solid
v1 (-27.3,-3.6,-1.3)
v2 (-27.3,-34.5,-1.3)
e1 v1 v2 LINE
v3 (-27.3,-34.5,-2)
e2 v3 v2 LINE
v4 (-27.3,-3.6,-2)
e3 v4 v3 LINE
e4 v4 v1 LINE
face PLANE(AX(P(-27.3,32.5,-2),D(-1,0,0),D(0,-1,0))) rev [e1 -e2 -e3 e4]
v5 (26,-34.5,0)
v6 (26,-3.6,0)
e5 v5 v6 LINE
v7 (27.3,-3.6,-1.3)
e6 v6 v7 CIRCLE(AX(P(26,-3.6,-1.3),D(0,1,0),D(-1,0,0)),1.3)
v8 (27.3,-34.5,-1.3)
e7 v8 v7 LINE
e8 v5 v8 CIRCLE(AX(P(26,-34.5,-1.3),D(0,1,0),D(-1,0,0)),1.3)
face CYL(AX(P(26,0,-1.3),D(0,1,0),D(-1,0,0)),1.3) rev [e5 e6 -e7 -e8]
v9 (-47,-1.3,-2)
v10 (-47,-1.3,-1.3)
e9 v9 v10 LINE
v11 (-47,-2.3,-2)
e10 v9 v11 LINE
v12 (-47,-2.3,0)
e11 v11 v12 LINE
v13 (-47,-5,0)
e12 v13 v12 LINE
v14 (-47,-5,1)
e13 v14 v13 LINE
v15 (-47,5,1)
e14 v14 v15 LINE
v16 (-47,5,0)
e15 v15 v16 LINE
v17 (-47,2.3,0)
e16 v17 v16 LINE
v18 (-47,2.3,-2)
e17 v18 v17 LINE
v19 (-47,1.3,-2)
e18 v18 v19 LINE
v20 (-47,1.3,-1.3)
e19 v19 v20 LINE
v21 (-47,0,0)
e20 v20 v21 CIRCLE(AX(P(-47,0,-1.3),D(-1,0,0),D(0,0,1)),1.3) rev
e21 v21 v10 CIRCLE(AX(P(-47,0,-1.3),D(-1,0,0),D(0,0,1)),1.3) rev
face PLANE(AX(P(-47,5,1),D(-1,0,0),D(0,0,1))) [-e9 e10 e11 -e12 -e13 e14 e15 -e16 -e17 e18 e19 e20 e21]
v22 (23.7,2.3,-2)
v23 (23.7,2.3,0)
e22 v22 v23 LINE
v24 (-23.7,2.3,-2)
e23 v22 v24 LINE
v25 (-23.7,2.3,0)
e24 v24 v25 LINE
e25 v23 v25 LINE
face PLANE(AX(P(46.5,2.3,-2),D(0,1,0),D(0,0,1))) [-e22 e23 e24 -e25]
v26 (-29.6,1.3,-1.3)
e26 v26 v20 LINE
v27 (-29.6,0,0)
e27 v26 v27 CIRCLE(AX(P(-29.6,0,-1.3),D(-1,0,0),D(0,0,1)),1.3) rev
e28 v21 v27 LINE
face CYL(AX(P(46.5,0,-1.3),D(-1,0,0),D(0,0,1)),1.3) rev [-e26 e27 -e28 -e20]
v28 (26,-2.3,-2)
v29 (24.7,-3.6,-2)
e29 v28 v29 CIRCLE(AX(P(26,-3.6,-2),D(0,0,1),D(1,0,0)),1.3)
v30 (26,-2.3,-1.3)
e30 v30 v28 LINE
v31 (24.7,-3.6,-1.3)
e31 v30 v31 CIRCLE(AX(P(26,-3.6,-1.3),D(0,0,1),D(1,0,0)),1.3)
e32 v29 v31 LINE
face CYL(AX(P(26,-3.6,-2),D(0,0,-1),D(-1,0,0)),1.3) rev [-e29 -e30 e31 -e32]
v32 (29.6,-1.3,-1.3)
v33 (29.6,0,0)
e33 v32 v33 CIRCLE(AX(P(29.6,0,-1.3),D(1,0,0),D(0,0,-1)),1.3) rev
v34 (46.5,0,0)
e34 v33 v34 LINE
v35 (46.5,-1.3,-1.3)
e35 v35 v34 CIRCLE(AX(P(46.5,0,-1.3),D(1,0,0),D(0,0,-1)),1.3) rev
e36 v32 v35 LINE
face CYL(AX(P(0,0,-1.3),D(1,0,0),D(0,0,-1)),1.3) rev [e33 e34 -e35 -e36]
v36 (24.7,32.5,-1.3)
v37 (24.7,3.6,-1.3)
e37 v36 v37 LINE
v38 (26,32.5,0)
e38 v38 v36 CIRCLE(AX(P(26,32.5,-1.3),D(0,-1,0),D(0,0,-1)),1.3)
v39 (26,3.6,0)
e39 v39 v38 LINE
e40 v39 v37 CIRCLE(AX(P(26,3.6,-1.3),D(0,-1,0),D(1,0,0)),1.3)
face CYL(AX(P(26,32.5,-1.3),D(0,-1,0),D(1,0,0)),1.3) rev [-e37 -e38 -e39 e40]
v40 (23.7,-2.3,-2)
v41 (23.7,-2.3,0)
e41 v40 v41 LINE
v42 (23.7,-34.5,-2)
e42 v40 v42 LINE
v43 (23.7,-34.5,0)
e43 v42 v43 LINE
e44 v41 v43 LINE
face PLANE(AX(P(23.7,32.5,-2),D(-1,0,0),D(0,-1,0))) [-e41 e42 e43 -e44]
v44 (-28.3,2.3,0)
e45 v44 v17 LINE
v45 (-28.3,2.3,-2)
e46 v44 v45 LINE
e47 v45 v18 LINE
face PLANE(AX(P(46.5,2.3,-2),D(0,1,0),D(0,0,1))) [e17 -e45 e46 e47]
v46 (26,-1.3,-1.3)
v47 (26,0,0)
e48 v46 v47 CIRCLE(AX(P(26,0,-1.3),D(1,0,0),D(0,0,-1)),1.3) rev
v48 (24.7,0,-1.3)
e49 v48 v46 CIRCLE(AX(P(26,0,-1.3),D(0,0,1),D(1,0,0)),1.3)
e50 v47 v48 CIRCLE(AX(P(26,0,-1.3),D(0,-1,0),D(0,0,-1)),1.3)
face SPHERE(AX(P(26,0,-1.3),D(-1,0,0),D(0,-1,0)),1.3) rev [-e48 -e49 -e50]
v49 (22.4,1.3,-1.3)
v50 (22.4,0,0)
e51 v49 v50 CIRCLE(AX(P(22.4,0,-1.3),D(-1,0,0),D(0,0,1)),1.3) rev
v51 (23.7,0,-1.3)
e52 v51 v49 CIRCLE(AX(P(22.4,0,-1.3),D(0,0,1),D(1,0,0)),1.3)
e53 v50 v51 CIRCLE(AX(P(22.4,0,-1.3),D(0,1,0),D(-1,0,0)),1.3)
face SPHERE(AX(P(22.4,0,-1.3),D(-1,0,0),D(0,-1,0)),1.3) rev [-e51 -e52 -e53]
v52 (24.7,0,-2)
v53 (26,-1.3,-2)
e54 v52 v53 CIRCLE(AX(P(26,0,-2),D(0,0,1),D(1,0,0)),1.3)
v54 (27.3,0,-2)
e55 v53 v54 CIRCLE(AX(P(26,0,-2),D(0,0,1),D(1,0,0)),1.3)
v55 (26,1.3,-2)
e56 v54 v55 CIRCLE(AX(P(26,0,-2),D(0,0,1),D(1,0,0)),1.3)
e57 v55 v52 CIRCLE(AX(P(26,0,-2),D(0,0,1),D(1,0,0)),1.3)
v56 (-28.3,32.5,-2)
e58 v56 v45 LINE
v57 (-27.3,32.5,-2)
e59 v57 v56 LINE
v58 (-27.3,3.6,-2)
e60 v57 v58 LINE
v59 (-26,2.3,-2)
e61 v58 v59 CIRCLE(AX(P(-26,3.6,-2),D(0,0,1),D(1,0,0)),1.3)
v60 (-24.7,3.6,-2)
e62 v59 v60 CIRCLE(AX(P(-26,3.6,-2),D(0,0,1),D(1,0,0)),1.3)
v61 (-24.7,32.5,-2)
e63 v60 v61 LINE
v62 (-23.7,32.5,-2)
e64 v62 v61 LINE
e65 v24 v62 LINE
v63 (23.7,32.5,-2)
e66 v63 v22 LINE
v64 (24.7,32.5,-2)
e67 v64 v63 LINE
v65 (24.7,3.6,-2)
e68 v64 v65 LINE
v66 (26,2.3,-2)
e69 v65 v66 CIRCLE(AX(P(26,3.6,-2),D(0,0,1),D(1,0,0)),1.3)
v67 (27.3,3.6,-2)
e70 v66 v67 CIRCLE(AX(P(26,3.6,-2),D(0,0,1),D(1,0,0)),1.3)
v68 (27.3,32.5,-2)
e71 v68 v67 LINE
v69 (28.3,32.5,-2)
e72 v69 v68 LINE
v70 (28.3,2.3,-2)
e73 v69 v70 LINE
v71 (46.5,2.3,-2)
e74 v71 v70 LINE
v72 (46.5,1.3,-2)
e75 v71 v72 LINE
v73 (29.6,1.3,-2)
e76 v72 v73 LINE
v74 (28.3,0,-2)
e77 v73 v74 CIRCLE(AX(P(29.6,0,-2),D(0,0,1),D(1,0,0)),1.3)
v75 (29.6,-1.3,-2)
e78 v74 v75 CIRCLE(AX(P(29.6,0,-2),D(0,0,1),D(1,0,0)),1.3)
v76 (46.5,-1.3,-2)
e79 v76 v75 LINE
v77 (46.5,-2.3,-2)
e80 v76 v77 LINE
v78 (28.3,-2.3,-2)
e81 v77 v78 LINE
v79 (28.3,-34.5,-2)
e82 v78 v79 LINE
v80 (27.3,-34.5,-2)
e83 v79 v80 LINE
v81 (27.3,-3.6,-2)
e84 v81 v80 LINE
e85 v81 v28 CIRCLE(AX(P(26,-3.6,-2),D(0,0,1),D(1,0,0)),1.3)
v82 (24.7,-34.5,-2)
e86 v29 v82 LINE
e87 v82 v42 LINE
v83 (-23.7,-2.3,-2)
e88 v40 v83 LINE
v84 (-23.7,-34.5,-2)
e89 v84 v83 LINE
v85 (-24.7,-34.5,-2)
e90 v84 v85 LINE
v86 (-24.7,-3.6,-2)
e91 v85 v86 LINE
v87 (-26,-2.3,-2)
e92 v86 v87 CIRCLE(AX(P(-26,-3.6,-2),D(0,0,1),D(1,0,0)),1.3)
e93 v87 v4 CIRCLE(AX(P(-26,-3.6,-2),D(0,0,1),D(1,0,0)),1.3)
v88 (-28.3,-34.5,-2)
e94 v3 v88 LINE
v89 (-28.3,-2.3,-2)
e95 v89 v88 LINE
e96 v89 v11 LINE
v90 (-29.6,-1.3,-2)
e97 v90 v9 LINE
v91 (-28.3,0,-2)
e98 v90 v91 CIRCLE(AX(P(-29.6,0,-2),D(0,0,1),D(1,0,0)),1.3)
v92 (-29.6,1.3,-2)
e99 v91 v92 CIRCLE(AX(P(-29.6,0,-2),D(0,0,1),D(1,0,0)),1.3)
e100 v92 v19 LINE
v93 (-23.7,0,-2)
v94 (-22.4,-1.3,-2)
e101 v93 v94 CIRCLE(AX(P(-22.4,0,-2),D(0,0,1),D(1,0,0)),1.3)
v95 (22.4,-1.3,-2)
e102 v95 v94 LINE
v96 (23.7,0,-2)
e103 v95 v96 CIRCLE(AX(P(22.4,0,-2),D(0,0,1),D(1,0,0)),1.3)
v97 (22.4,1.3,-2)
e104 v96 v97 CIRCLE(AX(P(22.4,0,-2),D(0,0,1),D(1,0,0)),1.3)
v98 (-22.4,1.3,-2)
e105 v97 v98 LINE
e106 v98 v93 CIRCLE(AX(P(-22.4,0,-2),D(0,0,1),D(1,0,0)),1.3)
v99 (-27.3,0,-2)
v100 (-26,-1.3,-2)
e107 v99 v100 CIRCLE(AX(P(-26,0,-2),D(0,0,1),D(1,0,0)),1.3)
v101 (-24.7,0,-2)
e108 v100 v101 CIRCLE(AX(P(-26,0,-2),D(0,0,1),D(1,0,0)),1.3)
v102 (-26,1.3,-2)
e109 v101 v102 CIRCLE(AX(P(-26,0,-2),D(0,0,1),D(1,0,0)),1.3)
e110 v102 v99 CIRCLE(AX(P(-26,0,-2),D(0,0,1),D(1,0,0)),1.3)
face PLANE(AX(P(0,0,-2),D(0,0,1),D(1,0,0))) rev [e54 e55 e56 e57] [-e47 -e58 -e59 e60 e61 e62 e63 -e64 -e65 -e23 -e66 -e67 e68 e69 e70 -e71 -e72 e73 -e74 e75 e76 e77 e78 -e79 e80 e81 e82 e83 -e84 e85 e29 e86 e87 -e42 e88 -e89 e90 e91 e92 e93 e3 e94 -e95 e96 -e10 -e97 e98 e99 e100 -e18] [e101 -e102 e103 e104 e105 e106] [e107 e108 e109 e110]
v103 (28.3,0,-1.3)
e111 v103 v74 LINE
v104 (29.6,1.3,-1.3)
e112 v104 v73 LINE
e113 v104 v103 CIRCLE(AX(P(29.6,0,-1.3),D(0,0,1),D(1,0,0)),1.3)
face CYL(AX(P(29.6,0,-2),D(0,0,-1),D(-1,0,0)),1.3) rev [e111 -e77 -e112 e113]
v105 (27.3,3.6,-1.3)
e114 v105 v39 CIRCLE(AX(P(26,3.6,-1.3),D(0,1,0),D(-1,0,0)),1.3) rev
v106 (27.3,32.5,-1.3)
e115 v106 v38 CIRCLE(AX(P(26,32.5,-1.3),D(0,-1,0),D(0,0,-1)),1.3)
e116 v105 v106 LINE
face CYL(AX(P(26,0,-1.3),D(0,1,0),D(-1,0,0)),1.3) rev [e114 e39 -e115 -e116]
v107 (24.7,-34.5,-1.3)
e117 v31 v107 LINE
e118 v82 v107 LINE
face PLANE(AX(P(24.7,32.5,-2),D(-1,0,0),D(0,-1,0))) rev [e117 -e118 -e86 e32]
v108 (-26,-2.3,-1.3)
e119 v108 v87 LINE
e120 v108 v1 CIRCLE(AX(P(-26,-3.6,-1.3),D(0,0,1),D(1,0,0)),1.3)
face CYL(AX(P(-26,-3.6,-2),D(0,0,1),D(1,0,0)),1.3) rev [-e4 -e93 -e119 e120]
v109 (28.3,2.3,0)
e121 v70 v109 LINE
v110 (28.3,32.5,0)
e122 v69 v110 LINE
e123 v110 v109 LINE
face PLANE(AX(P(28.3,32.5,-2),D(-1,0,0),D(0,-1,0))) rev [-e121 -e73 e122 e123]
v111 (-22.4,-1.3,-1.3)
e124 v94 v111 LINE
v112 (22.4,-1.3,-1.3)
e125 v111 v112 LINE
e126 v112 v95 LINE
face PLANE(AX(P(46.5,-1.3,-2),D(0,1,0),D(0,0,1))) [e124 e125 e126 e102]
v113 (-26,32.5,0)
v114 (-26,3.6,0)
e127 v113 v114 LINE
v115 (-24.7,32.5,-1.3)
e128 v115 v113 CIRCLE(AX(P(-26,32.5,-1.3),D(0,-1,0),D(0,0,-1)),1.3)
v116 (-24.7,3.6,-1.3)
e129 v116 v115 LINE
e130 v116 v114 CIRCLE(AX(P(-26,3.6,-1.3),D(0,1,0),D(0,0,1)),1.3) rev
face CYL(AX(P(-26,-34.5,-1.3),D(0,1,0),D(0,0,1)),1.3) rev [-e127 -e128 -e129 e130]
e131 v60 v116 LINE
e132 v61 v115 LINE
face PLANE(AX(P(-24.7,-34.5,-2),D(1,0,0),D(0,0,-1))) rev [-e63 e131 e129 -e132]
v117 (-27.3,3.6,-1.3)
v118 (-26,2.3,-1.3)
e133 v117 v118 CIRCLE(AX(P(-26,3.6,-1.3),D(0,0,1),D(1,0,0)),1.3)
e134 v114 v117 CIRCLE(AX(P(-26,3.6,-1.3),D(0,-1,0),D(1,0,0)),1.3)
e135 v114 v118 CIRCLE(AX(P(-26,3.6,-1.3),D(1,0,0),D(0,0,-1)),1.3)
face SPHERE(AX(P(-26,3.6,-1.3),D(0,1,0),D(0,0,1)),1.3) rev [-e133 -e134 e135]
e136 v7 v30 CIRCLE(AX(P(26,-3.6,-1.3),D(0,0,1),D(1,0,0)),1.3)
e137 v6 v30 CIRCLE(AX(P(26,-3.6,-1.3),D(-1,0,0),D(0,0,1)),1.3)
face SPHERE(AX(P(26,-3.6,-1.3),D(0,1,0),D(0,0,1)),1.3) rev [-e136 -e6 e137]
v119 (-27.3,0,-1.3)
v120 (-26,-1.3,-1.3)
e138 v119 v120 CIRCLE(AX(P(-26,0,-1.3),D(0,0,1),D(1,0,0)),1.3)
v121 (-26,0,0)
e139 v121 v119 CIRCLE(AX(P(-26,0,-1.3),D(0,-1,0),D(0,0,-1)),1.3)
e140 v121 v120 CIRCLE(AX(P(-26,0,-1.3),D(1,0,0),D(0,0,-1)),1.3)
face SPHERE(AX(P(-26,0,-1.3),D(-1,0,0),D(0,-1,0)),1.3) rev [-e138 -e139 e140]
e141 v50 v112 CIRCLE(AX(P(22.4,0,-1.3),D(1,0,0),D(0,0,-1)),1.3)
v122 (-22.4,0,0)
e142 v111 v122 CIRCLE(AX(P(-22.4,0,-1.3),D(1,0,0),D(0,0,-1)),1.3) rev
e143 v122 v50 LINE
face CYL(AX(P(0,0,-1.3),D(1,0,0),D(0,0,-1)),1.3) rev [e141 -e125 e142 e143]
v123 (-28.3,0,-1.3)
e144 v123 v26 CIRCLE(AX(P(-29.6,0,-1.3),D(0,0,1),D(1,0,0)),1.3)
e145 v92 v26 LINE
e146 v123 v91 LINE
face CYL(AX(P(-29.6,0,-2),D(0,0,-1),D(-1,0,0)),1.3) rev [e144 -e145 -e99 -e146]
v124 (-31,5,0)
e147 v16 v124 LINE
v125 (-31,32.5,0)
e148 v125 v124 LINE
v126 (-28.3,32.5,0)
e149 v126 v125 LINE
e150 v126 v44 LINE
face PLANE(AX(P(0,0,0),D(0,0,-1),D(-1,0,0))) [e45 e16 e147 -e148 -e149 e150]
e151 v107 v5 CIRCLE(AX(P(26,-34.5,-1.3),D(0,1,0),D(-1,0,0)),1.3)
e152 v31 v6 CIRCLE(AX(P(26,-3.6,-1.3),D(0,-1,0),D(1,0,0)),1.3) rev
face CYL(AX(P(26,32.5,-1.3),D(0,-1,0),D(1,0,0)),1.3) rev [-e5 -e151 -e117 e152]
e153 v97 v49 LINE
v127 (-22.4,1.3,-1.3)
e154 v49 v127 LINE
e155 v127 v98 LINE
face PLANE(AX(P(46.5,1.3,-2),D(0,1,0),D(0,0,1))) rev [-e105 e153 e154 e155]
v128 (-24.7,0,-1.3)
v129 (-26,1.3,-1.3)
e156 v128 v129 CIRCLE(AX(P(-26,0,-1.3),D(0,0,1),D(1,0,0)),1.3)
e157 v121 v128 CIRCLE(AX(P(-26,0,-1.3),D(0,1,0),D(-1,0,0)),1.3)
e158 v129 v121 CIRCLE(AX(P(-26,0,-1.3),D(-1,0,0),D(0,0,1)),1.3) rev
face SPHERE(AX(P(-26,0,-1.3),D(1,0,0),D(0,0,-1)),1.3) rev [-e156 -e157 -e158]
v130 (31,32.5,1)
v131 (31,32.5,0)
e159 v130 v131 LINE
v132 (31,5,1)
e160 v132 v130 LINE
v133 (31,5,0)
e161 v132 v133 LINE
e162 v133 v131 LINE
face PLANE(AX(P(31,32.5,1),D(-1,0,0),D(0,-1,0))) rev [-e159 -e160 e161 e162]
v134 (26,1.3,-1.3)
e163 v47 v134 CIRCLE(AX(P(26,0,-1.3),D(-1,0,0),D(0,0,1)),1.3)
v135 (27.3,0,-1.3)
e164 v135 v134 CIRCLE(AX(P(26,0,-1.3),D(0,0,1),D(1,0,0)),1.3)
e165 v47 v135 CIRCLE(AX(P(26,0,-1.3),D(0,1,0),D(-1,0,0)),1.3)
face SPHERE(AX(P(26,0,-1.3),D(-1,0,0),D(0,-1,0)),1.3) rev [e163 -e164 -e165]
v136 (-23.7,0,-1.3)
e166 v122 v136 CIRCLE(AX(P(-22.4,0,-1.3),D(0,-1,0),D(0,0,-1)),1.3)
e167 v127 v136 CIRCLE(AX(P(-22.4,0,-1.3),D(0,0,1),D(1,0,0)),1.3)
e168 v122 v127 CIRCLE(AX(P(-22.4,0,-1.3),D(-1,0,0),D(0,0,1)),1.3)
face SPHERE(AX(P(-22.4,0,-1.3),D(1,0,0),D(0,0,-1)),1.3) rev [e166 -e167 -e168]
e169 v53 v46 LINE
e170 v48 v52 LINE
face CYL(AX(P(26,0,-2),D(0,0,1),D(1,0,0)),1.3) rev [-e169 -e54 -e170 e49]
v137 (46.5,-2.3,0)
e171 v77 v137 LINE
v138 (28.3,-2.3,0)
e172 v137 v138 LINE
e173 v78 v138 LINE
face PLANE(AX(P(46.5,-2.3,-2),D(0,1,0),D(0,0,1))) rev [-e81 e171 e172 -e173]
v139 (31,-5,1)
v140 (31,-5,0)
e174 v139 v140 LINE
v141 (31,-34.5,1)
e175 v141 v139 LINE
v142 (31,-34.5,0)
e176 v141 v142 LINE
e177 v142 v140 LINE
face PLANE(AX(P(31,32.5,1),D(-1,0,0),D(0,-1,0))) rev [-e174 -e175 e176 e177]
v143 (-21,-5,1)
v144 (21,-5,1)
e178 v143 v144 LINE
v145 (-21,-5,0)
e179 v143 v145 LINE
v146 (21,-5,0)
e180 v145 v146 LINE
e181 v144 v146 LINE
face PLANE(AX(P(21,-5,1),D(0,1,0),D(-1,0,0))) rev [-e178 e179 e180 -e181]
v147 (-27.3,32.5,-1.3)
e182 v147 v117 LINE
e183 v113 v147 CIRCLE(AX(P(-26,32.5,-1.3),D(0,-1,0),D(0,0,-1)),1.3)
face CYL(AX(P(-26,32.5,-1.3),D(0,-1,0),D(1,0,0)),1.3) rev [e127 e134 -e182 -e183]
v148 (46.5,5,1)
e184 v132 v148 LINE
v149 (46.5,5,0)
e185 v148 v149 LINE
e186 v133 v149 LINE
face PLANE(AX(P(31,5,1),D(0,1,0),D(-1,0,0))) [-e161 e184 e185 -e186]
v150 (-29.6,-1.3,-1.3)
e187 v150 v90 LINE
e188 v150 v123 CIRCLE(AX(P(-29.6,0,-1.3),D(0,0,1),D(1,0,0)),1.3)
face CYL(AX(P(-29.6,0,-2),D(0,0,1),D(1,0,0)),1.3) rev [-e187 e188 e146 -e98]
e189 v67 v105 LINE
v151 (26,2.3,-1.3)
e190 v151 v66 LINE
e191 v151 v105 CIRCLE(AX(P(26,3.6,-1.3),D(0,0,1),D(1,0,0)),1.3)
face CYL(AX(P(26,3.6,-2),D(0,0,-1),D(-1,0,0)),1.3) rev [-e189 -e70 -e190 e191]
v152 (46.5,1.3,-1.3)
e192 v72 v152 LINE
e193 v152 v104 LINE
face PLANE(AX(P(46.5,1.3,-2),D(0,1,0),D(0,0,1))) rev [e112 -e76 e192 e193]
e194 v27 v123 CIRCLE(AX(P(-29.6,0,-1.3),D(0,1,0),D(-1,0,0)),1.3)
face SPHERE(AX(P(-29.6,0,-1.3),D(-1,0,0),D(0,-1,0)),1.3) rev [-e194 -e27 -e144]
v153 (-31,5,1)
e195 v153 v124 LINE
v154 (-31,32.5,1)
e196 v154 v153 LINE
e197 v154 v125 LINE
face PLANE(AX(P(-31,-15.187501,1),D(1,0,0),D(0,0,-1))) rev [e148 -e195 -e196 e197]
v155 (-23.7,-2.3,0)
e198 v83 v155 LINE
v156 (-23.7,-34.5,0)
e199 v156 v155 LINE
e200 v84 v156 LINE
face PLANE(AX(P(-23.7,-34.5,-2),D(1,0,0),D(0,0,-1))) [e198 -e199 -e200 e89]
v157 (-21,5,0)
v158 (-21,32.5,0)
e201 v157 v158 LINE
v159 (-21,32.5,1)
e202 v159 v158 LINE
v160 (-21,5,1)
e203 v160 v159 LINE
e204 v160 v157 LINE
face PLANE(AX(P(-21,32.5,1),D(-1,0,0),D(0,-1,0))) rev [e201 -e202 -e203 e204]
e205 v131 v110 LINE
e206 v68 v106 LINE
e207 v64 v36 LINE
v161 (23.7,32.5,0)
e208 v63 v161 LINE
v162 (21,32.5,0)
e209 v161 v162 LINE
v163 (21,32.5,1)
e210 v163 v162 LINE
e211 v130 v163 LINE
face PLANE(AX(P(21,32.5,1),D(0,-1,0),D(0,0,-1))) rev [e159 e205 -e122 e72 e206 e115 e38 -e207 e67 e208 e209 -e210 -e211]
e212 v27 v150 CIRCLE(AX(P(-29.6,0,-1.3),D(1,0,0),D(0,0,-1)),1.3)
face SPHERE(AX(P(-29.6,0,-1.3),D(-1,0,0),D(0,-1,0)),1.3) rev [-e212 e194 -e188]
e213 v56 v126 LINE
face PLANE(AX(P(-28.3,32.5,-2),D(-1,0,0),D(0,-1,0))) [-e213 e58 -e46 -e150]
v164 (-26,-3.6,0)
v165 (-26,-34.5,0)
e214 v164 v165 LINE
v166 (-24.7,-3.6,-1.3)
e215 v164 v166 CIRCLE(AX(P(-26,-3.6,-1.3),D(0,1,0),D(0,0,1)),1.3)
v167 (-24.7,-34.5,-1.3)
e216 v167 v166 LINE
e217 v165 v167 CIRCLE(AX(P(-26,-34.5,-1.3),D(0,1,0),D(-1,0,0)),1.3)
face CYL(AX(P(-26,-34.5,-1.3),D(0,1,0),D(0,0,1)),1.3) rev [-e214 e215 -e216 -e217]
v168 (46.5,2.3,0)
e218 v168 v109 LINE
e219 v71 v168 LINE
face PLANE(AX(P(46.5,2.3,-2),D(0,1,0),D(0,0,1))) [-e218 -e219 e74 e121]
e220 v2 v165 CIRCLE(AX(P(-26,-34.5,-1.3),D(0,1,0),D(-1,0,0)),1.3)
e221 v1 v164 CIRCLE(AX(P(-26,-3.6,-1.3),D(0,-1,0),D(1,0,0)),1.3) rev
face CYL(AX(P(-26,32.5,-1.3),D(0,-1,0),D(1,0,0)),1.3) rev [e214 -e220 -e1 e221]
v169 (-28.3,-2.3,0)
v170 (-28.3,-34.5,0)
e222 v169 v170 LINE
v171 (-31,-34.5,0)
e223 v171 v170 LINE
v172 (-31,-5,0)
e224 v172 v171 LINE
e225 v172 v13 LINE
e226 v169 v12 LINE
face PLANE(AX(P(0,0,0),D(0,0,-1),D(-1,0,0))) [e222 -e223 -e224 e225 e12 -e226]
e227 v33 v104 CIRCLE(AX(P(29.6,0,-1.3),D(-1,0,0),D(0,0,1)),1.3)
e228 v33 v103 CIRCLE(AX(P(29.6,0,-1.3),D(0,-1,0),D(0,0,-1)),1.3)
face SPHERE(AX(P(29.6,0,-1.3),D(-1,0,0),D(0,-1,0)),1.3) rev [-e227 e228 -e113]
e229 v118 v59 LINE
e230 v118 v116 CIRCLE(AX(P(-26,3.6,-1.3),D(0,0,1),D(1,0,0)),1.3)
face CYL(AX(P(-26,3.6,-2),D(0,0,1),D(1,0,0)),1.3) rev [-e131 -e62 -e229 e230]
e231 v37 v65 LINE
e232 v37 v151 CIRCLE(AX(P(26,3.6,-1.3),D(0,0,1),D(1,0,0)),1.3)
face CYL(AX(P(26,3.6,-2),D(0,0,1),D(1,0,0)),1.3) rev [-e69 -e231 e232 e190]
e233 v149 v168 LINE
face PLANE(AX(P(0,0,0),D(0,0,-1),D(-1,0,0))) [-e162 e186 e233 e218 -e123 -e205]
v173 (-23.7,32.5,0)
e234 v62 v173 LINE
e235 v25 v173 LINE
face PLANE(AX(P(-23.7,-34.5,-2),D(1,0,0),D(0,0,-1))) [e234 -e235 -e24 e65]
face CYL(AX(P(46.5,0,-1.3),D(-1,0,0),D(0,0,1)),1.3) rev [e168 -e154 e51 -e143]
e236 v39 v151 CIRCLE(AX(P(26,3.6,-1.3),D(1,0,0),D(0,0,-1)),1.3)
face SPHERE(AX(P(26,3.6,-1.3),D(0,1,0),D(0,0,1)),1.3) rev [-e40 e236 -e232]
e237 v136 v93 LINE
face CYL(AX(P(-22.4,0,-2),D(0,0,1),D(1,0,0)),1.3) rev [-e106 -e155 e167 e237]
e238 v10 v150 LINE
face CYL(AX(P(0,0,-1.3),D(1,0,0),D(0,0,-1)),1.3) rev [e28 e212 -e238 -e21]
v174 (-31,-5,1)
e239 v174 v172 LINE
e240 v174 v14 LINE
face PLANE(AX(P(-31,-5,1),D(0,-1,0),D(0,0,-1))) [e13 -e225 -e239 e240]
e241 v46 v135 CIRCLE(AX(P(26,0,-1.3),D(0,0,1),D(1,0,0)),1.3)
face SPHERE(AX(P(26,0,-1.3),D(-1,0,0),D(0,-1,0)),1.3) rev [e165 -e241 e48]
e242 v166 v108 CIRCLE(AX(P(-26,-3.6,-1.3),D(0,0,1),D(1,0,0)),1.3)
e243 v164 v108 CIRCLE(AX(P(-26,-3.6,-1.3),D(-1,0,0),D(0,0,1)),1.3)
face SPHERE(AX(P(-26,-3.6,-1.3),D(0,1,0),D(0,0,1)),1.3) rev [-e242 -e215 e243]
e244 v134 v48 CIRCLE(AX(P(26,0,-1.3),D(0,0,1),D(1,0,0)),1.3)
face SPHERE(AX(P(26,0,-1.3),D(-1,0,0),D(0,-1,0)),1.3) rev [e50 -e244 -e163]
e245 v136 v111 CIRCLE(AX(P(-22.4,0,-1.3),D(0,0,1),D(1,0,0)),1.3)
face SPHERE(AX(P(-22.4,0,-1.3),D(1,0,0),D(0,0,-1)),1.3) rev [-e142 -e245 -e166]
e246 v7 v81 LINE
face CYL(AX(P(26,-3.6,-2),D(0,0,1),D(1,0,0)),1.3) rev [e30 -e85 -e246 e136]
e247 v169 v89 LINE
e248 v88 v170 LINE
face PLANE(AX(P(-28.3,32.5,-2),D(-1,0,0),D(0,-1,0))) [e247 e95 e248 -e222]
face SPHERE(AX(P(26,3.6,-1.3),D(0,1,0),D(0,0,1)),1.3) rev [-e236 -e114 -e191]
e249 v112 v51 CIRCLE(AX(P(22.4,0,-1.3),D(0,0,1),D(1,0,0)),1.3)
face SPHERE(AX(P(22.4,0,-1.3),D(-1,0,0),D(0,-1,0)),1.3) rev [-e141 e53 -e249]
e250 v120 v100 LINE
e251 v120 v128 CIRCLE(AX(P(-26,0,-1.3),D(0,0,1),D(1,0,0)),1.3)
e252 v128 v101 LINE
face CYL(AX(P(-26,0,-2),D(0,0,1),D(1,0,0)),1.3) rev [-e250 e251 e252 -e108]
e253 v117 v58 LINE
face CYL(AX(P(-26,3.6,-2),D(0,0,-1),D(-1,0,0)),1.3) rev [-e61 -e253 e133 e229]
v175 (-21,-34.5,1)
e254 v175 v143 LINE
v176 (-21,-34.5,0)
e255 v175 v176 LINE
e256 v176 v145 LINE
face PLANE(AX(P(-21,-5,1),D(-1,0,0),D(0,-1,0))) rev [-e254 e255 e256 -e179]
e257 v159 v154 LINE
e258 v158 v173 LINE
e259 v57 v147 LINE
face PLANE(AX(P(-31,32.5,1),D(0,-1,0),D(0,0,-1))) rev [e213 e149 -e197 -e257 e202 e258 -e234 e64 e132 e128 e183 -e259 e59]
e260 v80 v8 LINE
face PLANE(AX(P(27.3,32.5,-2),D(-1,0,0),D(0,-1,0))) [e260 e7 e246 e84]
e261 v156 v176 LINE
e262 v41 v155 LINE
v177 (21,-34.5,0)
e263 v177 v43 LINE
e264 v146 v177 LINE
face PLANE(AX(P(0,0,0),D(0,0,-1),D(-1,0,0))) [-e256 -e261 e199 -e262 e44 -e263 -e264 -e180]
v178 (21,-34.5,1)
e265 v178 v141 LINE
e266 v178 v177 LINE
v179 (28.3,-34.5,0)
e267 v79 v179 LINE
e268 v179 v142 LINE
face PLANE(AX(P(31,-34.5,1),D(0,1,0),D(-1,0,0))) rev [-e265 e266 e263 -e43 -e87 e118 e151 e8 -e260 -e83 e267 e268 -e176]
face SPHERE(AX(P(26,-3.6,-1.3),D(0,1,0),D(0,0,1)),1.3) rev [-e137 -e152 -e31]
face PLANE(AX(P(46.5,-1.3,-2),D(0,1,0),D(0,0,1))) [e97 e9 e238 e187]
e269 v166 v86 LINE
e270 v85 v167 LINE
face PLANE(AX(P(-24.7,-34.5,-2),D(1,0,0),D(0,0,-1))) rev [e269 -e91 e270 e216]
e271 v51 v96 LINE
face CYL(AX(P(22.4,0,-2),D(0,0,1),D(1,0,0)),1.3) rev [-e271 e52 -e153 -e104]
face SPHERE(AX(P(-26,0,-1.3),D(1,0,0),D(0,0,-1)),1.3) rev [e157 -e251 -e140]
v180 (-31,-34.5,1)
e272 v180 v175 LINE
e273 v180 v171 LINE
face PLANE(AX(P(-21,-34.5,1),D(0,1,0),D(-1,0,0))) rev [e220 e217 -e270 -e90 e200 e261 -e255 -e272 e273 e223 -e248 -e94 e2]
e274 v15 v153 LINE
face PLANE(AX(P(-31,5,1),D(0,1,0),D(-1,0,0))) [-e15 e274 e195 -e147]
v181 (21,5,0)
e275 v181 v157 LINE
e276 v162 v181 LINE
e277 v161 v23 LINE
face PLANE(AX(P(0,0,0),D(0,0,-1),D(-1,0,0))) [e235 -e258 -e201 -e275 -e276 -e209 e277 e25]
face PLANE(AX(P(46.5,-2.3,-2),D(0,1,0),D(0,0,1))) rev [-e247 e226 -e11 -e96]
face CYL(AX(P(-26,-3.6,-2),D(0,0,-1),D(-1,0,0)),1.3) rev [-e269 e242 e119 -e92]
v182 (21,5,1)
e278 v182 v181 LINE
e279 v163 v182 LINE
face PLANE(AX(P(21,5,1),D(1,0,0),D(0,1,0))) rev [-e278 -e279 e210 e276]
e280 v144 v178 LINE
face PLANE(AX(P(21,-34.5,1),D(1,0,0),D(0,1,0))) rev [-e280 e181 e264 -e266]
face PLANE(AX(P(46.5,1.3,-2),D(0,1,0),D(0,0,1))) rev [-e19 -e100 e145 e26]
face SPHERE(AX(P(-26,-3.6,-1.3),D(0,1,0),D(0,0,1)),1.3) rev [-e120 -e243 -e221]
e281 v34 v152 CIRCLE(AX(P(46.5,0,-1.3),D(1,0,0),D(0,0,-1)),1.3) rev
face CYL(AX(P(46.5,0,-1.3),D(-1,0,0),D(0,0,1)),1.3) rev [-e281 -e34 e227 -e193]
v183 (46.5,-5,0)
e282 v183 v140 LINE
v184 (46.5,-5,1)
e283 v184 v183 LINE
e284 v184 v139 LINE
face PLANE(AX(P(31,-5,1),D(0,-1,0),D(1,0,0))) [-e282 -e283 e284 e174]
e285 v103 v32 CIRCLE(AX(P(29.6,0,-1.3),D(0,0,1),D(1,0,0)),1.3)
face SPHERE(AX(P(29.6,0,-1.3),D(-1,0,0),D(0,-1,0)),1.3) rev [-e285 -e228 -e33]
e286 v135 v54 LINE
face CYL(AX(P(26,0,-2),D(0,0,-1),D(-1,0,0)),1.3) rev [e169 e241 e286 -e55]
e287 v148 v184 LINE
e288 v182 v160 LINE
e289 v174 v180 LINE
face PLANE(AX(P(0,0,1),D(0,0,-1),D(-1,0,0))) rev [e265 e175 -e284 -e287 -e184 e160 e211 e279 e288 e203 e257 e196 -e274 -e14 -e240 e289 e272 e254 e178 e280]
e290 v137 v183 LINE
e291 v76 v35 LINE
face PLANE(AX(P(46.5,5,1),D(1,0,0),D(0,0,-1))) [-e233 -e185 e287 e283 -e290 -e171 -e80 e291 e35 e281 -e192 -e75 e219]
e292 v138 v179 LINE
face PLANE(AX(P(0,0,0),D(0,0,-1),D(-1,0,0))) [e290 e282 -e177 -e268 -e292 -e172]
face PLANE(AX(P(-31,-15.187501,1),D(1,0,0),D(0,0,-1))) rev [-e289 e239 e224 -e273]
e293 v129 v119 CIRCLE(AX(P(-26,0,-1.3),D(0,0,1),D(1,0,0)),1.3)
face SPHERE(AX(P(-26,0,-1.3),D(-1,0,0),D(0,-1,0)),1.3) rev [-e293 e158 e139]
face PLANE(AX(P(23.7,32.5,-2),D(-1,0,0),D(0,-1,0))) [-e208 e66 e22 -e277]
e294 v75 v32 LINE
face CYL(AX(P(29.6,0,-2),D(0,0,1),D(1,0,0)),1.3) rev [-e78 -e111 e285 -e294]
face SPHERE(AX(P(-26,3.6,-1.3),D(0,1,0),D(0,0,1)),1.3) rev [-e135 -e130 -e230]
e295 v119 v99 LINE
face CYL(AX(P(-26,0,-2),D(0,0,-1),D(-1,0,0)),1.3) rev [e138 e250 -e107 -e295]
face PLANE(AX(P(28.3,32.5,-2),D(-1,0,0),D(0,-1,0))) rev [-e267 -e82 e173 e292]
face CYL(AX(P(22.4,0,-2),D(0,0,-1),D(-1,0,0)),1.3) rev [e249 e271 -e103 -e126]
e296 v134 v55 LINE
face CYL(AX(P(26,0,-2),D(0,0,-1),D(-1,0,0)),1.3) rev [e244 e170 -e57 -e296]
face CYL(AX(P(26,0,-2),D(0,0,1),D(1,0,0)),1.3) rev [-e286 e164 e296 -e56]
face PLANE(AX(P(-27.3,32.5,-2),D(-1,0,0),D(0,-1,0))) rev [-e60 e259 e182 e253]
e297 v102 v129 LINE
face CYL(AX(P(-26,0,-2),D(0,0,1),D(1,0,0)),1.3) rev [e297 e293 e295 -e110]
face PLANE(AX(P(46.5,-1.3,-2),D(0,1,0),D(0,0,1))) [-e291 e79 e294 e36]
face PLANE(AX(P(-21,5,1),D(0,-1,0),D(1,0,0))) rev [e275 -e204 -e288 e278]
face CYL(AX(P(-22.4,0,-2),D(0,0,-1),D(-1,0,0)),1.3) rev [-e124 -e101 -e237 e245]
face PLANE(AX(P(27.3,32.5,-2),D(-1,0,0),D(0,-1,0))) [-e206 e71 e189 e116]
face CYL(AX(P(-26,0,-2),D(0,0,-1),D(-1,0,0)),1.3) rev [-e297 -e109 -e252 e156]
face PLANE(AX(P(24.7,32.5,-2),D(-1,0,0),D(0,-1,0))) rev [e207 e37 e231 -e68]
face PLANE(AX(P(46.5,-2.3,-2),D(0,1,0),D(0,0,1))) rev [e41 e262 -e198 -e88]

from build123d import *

# Parameters (mm, degrees)
AUFSATZ_LINEAR_AUSTRAGEN1_DEPTH = 1
SKIZZE2_W                       = 16
SKIZZE2_H                       = 10
SKIZZE2_W_2                     = 15.5
AUFSATZ_LINEAR_AUSTRAGEN2_DEPTH = 1
SKIZZE4_W                       = 93.5
SKIZZE4_H                       = 1
SKIZZE4_W_2                     = 1
SKIZZE4_H_2                     = 67
AUFSATZ_LINEAR_AUSTRAGEN5_DEPTH = 2
VERRUNDUNG1_R                   = 1.3
VERRUNDUNG2_R                   = 1.3
VERRUNDUNG3_R                   = 1.3
VERRUNDUNG4_R                   = 1.3
VERRUNDUNG5_R                   = 1.3
VERRUNDUNG6_R                   = 1.3
VERRUNDUNG7_R                   = 1.3
VERRUNDUNG8_R                   = 1.3
VERRUNDUNG9_R                   = 1.3
VERRUNDUNG10_R                  = 1.3
VERRUNDUNG11_R                  = 1.3
VERRUNDUNG12_R                  = 1.3
VERRUNDUNG13_R                  = 1.3


with BuildPart() as part:
    # Skizze1 → Aufsatz-Linear austragen1 (new body)
    with BuildSketch(Plane.XY):
        Polygon((-31, -15.187500578), (-31, 32.5), (-21, 32.5), (-21, 5), (21, 5), (21, 32.5), (31, 32.5), (31, -34.5), (21, -34.5), (21, -5), (-21, -5), (-21, -34.5), (-31, -34.5), align=None)
    extrude(amount=AUFSATZ_LINEAR_AUSTRAGEN1_DEPTH)

    # Skizze2 → Aufsatz-Linear austragen2 (add)
    with BuildSketch(Plane(origin=(0, 0, 0), x_dir=(-1, 0, 0), z_dir=(0, 0, -1))):
        with Locations((39, 0)):
            Rectangle(SKIZZE2_W, SKIZZE2_H)
        with Locations((-38.75, 0)):
            Rectangle(SKIZZE2_W_2, SKIZZE2_H)
    extrude(amount=-AUFSATZ_LINEAR_AUSTRAGEN2_DEPTH)

    # Skizze4 → Aufsatz-Linear austragen5 (add)
    with BuildSketch(Plane(origin=(0, 0, 0), x_dir=(-1, 0, 0), z_dir=(0, 0, -1))):
        with Locations((0.25, 1.8)):
            Rectangle(SKIZZE4_W, SKIZZE4_H)
        with Locations((0.25, -1.8)):
            Rectangle(SKIZZE4_W, SKIZZE4_H)
        with Locations((-27.8, -1)):
            Rectangle(SKIZZE4_W_2, SKIZZE4_H_2)
        with Locations((-24.2, -1)):
            Rectangle(SKIZZE4_W_2, SKIZZE4_H_2)
        with Locations((24.2, -1)):
            Rectangle(SKIZZE4_W_2, SKIZZE4_H_2)
        with Locations((27.8, -1)):
            Rectangle(SKIZZE4_W_2, SKIZZE4_H_2)
    extrude(amount=AUFSATZ_LINEAR_AUSTRAGEN5_DEPTH)

    # Verrundung1
    verrundung1_edges = [part.edges().sort_by_distance(p)[0] for p in [
        (24.7, 17.4, 0),
    ]]
    fillet(verrundung1_edges, radius=VERRUNDUNG1_R)

    # Verrundung2
    verrundung2_edges = [part.edges().sort_by_distance(p)[0] for p in [
        (27.3, 17.4, 0),
    ]]
    fillet(verrundung2_edges, radius=VERRUNDUNG2_R - 0.0001)  # a hair under: the kernel refuses the full size

    # Verrundung3
    verrundung3_edges = [part.edges().sort_by_distance(p)[0] for p in [
        (37.4, 1.3, 0),
        (26, 1.3, 0),
        (0, 1.3, 0),
        (-26, 1.3, 0),
        (-37.65, 1.3, 0),
    ]]
    fillet(verrundung3_edges, radius=VERRUNDUNG3_R)

    # Verrundung4
    verrundung4_edges = [part.edges().sort_by_distance(p)[0] for p in [
        (37.4, -1.3, 0),
        (26, -1.3, 0),
        (0, -1.3, 0),
        (-26, -1.3, 0),
        (-37.65, -1.3, 0),
    ]]
    fillet(verrundung4_edges, radius=VERRUNDUNG4_R - 0.0001)  # a hair under: the kernel refuses the full size

    # Verrundung5
    verrundung5_edges = [part.edges().sort_by_distance(p)[0] for p in [
        (24.7, 2.3, -1.65),
        (27.3, 2.3, -1.64995),
        (26.919268105, 2.3, -0.380731895),
        (25.080761184, 2.3, -0.380761184),
    ]]
    fillet(verrundung5_edges, radius=VERRUNDUNG5_R - 0.0001)  # a hair under: the kernel refuses the full size

    # Verrundung6
    verrundung6_edges = [part.edges().sort_by_distance(p)[0] for p in [
        (24.7, 1.3, -1.65),
        (24.7, -1.3, -1.64995),
        (28.3, 1.3, -1.65),
        (28.3, -1.3, -1.64995),
        (24.7, -0.919268105, -0.380731895),
        (24.7, 0.919238816, -0.380761184),
        (28.3, 0.919238816, -0.380761184),
        (28.3, -0.919268105, -0.380731895),
    ]]
    fillet(verrundung6_edges, radius=VERRUNDUNG6_R - 0.0001)  # a hair under: the kernel refuses the full size

    # Verrundung7
    verrundung7_edges = [part.edges().sort_by_distance(p)[0] for p in [
        (23.7, -1.3, -1.64995),
        (23.7, 1.3, -1.65),
        (27.3, -1.3, -1.64995),
        (27.3, 1.3, -1.65),
        (23.7, 0.919238816, -0.380761184),
        (23.7, -0.919268105, -0.380731895),
        (27.3, -0.919268105, -0.380731895),
        (27.3, 0.919238816, -0.380761184),
    ]]
    fillet(verrundung7_edges, radius=VERRUNDUNG7_R - 0.0001)  # a hair under: the kernel refuses the full size

    # Verrundung8
    verrundung8_edges = [part.edges().sort_by_distance(p)[0] for p in [
        (27.3, -18.4, 0),
        (24.7, -18.4, 0),
    ]]
    fillet(verrundung8_edges, radius=VERRUNDUNG8_R - 0.0001)  # a hair under: the kernel refuses the full size

    # Verrundung9
    verrundung9_edges = [part.edges().sort_by_distance(p)[0] for p in [
        (27.3, -2.3, -1.64995),
        (24.7, -2.3, -1.64995),
        (25.080731895, -2.3, -0.380731895),
        (26.919268105, -2.3, -0.380731895),
    ]]
    fillet(verrundung9_edges, radius=VERRUNDUNG9_R - 0.0001)  # a hair under: the kernel refuses the full size

    # Verrundung10
    verrundung10_edges = [part.edges().sort_by_distance(p)[0] for p in [
        (-24.7, -1.3, -1.64995),
        (-24.7, -0.919268105, -0.380731895),
        (-24.7, 1.3, -1.65),
        (-28.3, -1.3, -1.64995),
        (-28.3, 1.3, -1.65),
        (-24.7, 0.919238816, -0.380761184),
        (-24.7, -18.4, 0),
        (-24.7, 17.4, 0),
        (-28.3, -0.919268105, -0.380731895),
        (-28.3, 0.919238816, -0.380761184),
    ]]
    fillet(verrundung10_edges, radius=VERRUNDUNG10_R - 0.0001)  # a hair under: the kernel refuses the full size

    # Verrundung11
    verrundung11_edges = [part.edges().sort_by_distance(p)[0] for p in [
        (-23.7, 1.3, -1.65),
        (-23.7, -1.3, -1.64995),
        (-27.3, 1.3, -1.65),
        (-27.3, -1.3, -1.64995),
        (-27.3, -18.4, 0),
        (-23.7, -0.919268105, -0.380731895),
        (-23.7, 0.919238816, -0.380761184),
        (-27.3, -0.919268105, -0.380731895),
        (-27.3, 0.919238816, -0.380761184),
        (-27.3, 17.4, 0),
    ]]
    fillet(verrundung11_edges, radius=VERRUNDUNG11_R - 0.0001)  # a hair under: the kernel refuses the full size

    # Verrundung12
    verrundung12_edges = [part.edges().sort_by_distance(p)[0] for p in [
        (-24.7, -2.3, -1.64995),
        (-27.3, -2.3, -1.64995),
        (-25.080731895, -2.3, -0.380731895),
        (-26.919268105, -2.3, -0.380731895),
    ]]
    fillet(verrundung12_edges, radius=VERRUNDUNG12_R - 0.0001)  # a hair under: the kernel refuses the full size

    # Verrundung13
    verrundung13_edges = [part.edges().sort_by_distance(p)[0] for p in [
        (-27.3, 2.3, -1.64995),
        (-24.7, 2.3, -1.64995),
        (-25.080731895, 2.3, -0.380731895),
        (-26.919268105, 2.3, -0.380731895),
    ]]
    fillet(verrundung13_edges, radius=VERRUNDUNG13_R - 0.0001)  # a hair under: the kernel refuses the full size


solid = part.part
